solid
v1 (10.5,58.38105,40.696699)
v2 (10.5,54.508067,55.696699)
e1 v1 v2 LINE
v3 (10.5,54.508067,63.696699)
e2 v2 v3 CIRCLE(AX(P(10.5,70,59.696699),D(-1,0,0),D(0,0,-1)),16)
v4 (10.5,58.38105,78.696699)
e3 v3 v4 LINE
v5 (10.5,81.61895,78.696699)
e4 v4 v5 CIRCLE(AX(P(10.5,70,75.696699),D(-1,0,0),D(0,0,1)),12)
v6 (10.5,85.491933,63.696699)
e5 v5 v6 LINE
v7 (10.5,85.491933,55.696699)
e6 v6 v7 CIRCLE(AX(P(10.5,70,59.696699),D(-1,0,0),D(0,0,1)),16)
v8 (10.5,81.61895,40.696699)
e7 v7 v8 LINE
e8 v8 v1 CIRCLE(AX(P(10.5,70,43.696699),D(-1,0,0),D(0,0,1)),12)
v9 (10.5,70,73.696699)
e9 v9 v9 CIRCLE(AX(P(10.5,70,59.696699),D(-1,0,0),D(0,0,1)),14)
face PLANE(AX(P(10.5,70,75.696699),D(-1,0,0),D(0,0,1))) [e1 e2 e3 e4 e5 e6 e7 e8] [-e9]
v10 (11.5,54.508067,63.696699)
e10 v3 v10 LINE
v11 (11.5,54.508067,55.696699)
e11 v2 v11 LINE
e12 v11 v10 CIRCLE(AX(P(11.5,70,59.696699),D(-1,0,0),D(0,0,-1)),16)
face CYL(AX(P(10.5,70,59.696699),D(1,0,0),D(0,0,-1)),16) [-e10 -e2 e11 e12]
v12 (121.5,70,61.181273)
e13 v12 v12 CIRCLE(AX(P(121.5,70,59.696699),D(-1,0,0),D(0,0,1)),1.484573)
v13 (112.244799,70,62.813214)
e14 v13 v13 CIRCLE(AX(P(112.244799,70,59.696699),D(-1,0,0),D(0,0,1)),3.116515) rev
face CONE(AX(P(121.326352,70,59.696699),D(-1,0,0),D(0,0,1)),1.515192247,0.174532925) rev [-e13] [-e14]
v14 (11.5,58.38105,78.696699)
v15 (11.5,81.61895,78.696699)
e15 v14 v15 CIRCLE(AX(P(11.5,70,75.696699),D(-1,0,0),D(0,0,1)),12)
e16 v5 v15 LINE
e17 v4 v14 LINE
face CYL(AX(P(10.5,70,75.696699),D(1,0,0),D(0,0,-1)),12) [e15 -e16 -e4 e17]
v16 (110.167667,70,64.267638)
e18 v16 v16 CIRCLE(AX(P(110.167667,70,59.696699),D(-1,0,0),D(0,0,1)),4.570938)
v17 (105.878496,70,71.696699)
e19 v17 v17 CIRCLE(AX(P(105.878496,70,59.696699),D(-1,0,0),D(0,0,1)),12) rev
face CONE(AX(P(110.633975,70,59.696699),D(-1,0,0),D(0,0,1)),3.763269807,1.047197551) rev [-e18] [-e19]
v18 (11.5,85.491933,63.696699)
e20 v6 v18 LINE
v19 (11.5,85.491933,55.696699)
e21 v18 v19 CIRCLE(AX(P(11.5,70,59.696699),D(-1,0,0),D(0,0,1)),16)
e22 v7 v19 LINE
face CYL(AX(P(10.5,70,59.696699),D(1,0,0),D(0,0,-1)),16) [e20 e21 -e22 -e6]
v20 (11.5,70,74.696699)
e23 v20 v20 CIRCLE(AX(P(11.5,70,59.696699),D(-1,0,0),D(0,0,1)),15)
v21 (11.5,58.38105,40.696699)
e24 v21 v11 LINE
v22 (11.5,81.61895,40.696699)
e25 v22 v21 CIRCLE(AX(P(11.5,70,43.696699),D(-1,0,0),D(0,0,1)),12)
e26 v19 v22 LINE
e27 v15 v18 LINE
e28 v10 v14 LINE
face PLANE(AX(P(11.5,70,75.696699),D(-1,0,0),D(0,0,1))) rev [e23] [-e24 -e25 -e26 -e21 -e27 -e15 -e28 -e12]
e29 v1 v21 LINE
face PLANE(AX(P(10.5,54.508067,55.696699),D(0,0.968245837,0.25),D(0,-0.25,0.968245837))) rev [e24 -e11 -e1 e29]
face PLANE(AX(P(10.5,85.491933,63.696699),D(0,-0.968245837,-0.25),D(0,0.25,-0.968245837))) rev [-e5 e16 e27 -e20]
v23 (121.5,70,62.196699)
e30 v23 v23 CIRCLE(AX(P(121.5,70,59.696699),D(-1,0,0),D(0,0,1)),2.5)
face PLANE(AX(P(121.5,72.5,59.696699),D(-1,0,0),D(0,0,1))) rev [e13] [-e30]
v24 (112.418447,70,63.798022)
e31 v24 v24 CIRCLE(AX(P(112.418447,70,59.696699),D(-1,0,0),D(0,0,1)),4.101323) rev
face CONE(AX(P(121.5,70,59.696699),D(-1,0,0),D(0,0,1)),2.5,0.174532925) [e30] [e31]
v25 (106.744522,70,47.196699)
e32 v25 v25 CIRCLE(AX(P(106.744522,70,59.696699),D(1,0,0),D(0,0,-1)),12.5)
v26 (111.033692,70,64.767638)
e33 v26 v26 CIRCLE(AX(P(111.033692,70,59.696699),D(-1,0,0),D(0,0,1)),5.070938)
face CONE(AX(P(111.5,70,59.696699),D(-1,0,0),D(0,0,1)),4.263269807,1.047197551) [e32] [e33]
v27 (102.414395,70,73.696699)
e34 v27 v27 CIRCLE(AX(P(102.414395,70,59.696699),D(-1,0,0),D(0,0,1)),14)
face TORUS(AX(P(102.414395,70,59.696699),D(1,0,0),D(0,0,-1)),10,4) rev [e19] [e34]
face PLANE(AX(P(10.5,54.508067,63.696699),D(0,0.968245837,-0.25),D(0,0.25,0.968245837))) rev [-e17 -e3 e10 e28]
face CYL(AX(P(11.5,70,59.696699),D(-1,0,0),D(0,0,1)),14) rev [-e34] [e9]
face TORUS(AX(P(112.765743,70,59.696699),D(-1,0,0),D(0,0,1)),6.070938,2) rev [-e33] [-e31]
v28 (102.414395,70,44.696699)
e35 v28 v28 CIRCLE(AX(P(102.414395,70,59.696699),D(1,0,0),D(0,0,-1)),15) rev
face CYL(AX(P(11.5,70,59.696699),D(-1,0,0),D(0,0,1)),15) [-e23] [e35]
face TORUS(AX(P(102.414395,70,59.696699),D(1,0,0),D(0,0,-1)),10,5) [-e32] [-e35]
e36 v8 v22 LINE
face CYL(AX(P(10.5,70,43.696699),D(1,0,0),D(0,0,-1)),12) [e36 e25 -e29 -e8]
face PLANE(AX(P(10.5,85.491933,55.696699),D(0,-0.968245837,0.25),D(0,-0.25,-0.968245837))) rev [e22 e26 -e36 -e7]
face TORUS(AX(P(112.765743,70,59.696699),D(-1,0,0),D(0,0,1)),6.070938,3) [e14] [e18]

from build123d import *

# Parameters (mm, degrees)
BOSS_EXTRUDE1_DEPTH     = 90
FILLET1_R               = 7.5
FILLET2_R               = 2
SKETCH2_W               = 20
SKETCH2_H               = 80
SKETCH2_W_2             = 32
BOSS_EXTRUDE2_DEPTH     = 20
SKETCH3_R               = 2.5
BOSS_EXTRUDE3_DEPTH     = 111
BOSS_EXTRUDE4_START     = 7.5
SKETCH4_W               = 80
SKETCH4_H               = 20
SKETCH4_R               = 3.25
BOSS_EXTRUDE4_DEPTH     = 20
MOVE_FACE1_BY           = 1.5
MOVE_FACE2_BY           = 1.5
FILLET3_R               = 4
FILLET4_R               = 4
CUT_EXTRUDE1_DEPTH      = 2
BOSS_EXTRUDE5_DEPTH     = 2
SKETCH7_W               = 58
SKETCH7_H               = 15
CUT_EXTRUDE2_DEPTH      = 0.5
SKETCH8_R               = 10
BOSS_EXTRUDE6_DEPTH     = 1.5
SKETCH10_R              = 4.25
SKETCH10_R_2            = 2.75
CUT_EXTRUDE_THIN1_DEPTH = 1.5
SKETCH11_RX             = 5
SKETCH11_RY             = 2.5
BOSS_EXTRUDE7_DEPTH     = 1.5
LPATTERN1_COUNT         = 3
LPATTERN1_PITCH         = 24
SKETCH12_RX             = 5
SKETCH12_RY             = 2.5
BOSS_EXTRUDE8_DEPTH     = 1.5
LPATTERN2_START         = 113.13708499
LPATTERN2_DEPTH         = 1.5
FILLET7_R               = 7.5
FILLET5_R               = 5
FILLET6_R               = 2
SHELL1_T                = -1
SKETCH14_R              = 14
BOSS_EXTRUDE9_DEPTH     = 1
BOSS_EXTRUDE10_DEPTH    = 1
BOSS_EXTRUDE11_START    = -30
SKETCH16_R              = 13
BOSS_EXTRUDE11_DEPTH    = 10
BOSS_EXTRUDE12_REACH    = 233.484
SKETCH18_R              = 3
SKETCH17_W              = 1.5
SKETCH17_H              = 20
SKETCH17_W_2            = 20
SKETCH17_H_2            = 1.5
EXTRUDE_THIN1_DEPTH     = 63.5
SKETCH20_R              = 12.5
BOSS_EXTRUDE13_DEPTH    = 5
FILLET8_R               = 2


# Read off the part's stored shape, not the designer's step: LPattern2, Body-Move/Copy1
with BuildPart() as part:
    # Sketch1 → Boss-Extrude1 (new, symmetric)
    with BuildSketch(Plane(origin=(0, 0, 0), x_dir=(0, 0, -1), z_dir=(1, 0, 0))):
        Polygon((0, 0), (0, 45), (-115, 45), (-160, 0), align=None)
    extrude(amount=BOSS_EXTRUDE1_DEPTH, both=True)

    # Fillet1
    fillet1_edges = [part.edges().sort_by_distance(p)[0] for p in [
        (0, 0, 160),
        (0, 45, 115),
        (0, 45, 0),
        (0, 0, 0),
    ]]
    fillet(fillet1_edges, radius=FILLET1_R)

    # Fillet2
    fillet2_edges = [part.edges().sort_by_distance(p)[0] for p in [
        (-90, 0, 74.696699141),
        (90, 0, 74.696699141),
        (-90, 27.803300859, 132.196699141),
        (-90, 45, 59.696699141),
        (-90, 22.5, 0),
        (-90, 44.429096494, 114.763524025),
        (-90, 2.196699141, 2.196699141),
        (-90, 42.803300859, 2.196699141),
        (-90, 4.629874257, 148.822494776),
        (90, 27.803300859, 132.196699141),
        (90, 22.5, 0),
        (90, 45, 59.696699141),
        (90, 44.429096494, 114.763524025),
        (90, 2.196699141, 2.196699141),
        (90, 42.803300859, 2.196699141),
        (90, 4.629874257, 148.822494776),
    ]]
    fillet(fillet2_edges, radius=FILLET2_R)

    # Sketch2 → Boss-Extrude2 (add)
    with BuildSketch(Plane(origin=(0, 45, 0), x_dir=(1, 0, 0), z_dir=(0, 1, 0))):
        with Locations((-71.5, -59.696699141)):
            Rectangle(SKETCH2_W, SKETCH2_H)
        with Locations((65.5, -59.696699141)):
            Rectangle(SKETCH2_W_2, SKETCH2_H)
    extrude(amount=BOSS_EXTRUDE2_DEPTH)

    # Sketch3 → Boss-Extrude3 (add)
    with BuildSketch(Plane(origin=(-61.5, 0, 0), x_dir=(0, 0, -1), z_dir=(1, 0, 0))):
        with Locations(Location((-89.696699141, 59.5, 0), (0, 0, 180))):
            Circle(SKETCH3_R)
        with Locations(Location((-89.696699141, 50.5, 0), (0, 0, 180))):
            Circle(SKETCH3_R)
        with Locations(Location((-29.696699141, 50.5, 0), (0, 0, 180))):
            Circle(SKETCH3_R)
        with Locations(Location((-29.696699141, 59.5, 0), (0, 0, 180))):
            Circle(SKETCH3_R)
    extrude(amount=BOSS_EXTRUDE3_DEPTH)

    # Fillet3
    fillet3_edges = [part.edges().sort_by_distance(p)[0] for p in [
        (65.5, 65, 99.696699141),
        (65.5, 65, 19.696699141),
        (-71.5, 65, 99.696699141),
        (-71.5, 65, 19.696699141),
    ]]
    fillet(fillet3_edges, radius=FILLET3_R)

    # Sketch5 → Cut-Extrude1 (cut)
    with BuildSketch(Plane(origin=(0, 80, 80), x_dir=(1, 0, 0), z_dir=(0, 0.7071067811865511, 0.707106781186544))):
        with BuildLine():
            Line((-65, -56.317279836), (65, -56.317279836))
            ThreePointArc((65, -56.317279836), (66.767766953, -57.049512883), (67.5, -58.817279836))
            Line((67.5, -58.817279836), (67.5, -88.817279836))
            ThreePointArc((67.5, -88.817279836), (66.767766953, -90.585046789), (65, -91.317279836))
            Line((65, -91.317279836), (-65, -91.317279836))
            ThreePointArc((-65, -91.317279836), (-66.767766953, -90.585046789), (-67.5, -88.817279836))
            Line((-67.5, -88.817279836), (-67.5, -58.817279836))
            ThreePointArc((-67.5, -58.817279836), (-66.767766953, -57.049512883), (-65, -56.317279836))
        make_face()
    extrude(amount=-CUT_EXTRUDE1_DEPTH, mode=Mode.SUBTRACT)


with BuildPart() as body_2:
    # Sketch4 → Boss-Extrude4 (new body)
    with BuildSketch(Plane(origin=(-61.5, 0, 0), x_dir=(0, 0, -1), z_dir=(1, 0, 0)).offset(BOSS_EXTRUDE4_START)):
        with Locations((-59.696699141, 55)):
            Rectangle(SKETCH4_W, SKETCH4_H)
        with Locations((-89.696699141, 59.5)):
            Circle(SKETCH4_R, mode=Mode.SUBTRACT)
        with Locations((-89.696699141, 50.5)):
            Circle(SKETCH4_R, mode=Mode.SUBTRACT)
        with Locations((-29.696699141, 59.5)):
            Circle(SKETCH4_R, mode=Mode.SUBTRACT)
        with Locations((-29.696699141, 50.5)):
            Circle(SKETCH4_R, mode=Mode.SUBTRACT)
    extrude(amount=BOSS_EXTRUDE4_DEPTH)

    # Move Face1: a face moved outward by 1.5
    extrude(body_2.faces().sort_by_distance((-44, 65, 59.696699141))[0], amount=MOVE_FACE1_BY, dir=(0, 1, 0))

    # Move Face2: a face moved inward by 1.5
    extrude(body_2.faces().sort_by_distance((-44, 45, 59.696699141))[0], amount=MOVE_FACE2_BY, dir=(0, 1, 0), mode=Mode.SUBTRACT)

    # Fillet4
    fillet4_edges = [body_2.edges().sort_by_distance(p)[0] for p in [
        (-44, 66.5, 99.696699141),
        (-44, 66.5, 19.696699141),
        (-44, 46.5, 19.696699141),
        (-44, 46.5, 99.696699141),
    ]]
    fillet(fillet4_edges, radius=FILLET4_R)


with BuildPart() as body_3:
    # Sketch6 → Boss-Extrude5 (new body)
    with BuildSketch(Plane(origin=(0, 78.585786438, 78.585786438), x_dir=(1, 0, 0), z_dir=(0, 0.7071067811865509, 0.7071067811865441))):
        with BuildLine():
            Line((65, -56.317279836), (-65, -56.317279836))
            ThreePointArc((-65, -56.317279836), (-66.767766953, -57.049512883), (-67.5, -58.817279836))
            Line((-67.5, -58.817279836), (-67.5, -88.817279836))
            ThreePointArc((-67.5, -88.817279836), (-66.767766953, -90.585046789), (-65, -91.317279836))
            Line((-65, -91.317279836), (65, -91.317279836))
            ThreePointArc((65, -91.317279836), (66.767766953, -90.585046789), (67.5, -88.817279836))
            Line((67.5, -88.817279836), (67.5, -58.817279836))
            ThreePointArc((67.5, -58.817279836), (66.767766953, -57.049512883), (65, -56.317279836))
        make_face()
    extrude(amount=BOSS_EXTRUDE5_DEPTH)

    # Sketch7 → Cut-Extrude2 (cut)
    with BuildSketch(Plane(origin=(0, 80, 80), x_dir=(1, 0, 0), z_dir=(0, 0.7071067811865509, 0.7071067811865441))):
        with Locations((-28.5, -71.817279836)):
            Rectangle(SKETCH7_W, SKETCH7_H)
    extrude(amount=-CUT_EXTRUDE2_DEPTH, mode=Mode.SUBTRACT)

    # Sketch8 → Boss-Extrude6 (add)
    with BuildSketch(Plane(origin=(0, 80, 80), x_dir=(1, 0, 0), z_dir=(0, 0.7071067811865509, 0.7071067811865441))):
        with Locations(Location((15.5, -71.817279836, 0), (0, 0, 270))):
            Circle(SKETCH8_R)
    extrude(amount=BOSS_EXTRUDE6_DEPTH)

    # Sketch10 → Cut-Extrude-Thin1 (cut)
    # profile 1 of 5: a face of its own
    with BuildSketch(Plane(origin=(0, 81.060660172, 81.060660172), x_dir=(1, 0, 0), z_dir=(0, 0.7071067811865509, 0.7071067811865441))):
        with Locations((15.5, -71.817279836)):
            Circle(SKETCH10_R)
        with Locations((15.5, -71.817279836)):
            Circle(SKETCH10_R_2, mode=Mode.SUBTRACT)
    # profile 2 of 5: a face of its own
    with BuildSketch(Plane(origin=(0, 81.060660172, 81.060660172), x_dir=(1, 0, 0), z_dir=(0, 0.7071067811865509, 0.7071067811865441))):
        Polygon((7.898602102, -65.27654211), (12.49479618, -69.872736188), (13.555456352, -68.812076016), (8.959262274, -64.215881939), align=None)
    # profile 3 of 5: a face of its own
    with BuildSketch(Plane(origin=(0, 81.060660172, 81.060660172), x_dir=(1, 0, 0), z_dir=(0, 0.7071067811865509, 0.7071067811865441))):
        Polygon((22.040737726, -64.215881939), (17.444543648, -68.812076016), (18.50520382, -69.872736188), (23.101397898, -65.27654211), align=None)
    # profile 4 of 5: a face of its own
    with BuildSketch(Plane(origin=(0, 81.060660172, 81.060660172), x_dir=(1, 0, 0), z_dir=(0, 0.7071067811865509, 0.7071067811865441))):
        Polygon((17.444543648, -74.822483656), (22.040737726, -79.418677734), (23.101397898, -78.358017562), (18.50520382, -73.761823485), align=None)
    # profile 5 of 5: a face of its own
    with BuildSketch(Plane(origin=(0, 81.060660172, 81.060660172), x_dir=(1, 0, 0), z_dir=(0, 0.7071067811865509, 0.7071067811865441))):
        Polygon((12.49479618, -73.761823485), (7.898602102, -78.358017562), (8.959262274, -79.418677734), (13.555456352, -74.822483656), align=None)
    extrude(amount=-CUT_EXTRUDE_THIN1_DEPTH, mode=Mode.SUBTRACT)

    # Sketch11 → Boss-Extrude7 (add)
    with BuildSketch(Plane(origin=(0, 80, 80), x_dir=(1, 0, 0), z_dir=(0, 0.7071067811865509, 0.7071067811865441))):
        with Locations((-52.5, -85.317279836)):
            Ellipse(SKETCH11_RX, SKETCH11_RY)
    boss_extrude7 = extrude(amount=BOSS_EXTRUDE7_DEPTH)

    # LPattern1: Boss-Extrude7 ×3
    with Locations(*[(i * LPATTERN1_PITCH, 0, 0) for i in range(1, LPATTERN1_COUNT)]):
        add(boss_extrude7)

    # Sketch12 → Boss-Extrude8 (add)
    with BuildSketch(Plane(origin=(0, 80, 80), x_dir=(1, 0, 0), z_dir=(0, 0.7071067811865509, 0.7071067811865441))):
        with Locations((32.5, -66.317279836)):
            Ellipse(SKETCH12_RX, SKETCH12_RY)
    extrude(amount=BOSS_EXTRUDE8_DEPTH)

    # LPattern2 outline → LPattern2 (add)
    with BuildSketch(Plane(origin=(0, 0, 0), x_dir=(1, 0, 0), z_dir=(0, 0.707106781186551, 0.7071067811865439)).offset(LPATTERN2_START)):
        with BuildLine():
            add(Edge.make_bspline(
                [(37.5, -74.317279836), (37.5, -69.987152818), (30, -72.152216327), (22.5, -74.317279836), (30, -76.482343346), (37.5, -78.647406855), (37.5, -74.317279836)],
                knots=[0, 0, 0, 2.094395102, 2.094395102, 4.188790205, 4.188790205, 6.283185307, 6.283185307, 6.283185307], degree=2, weights=[1, 0.5, 1, 0.5, 1, 0.5, 1]))
        make_face()
        with BuildLine():
            add(Edge.make_bspline(
                [(37.5, -82.317279836), (37.5, -77.987152818), (30, -80.152216327), (22.5, -82.317279836), (30, -84.482343346), (37.5, -86.647406855), (37.5, -82.317279836)],
                knots=[0, 0, 0, 2.094395102, 2.094395102, 4.188790205, 4.188790205, 6.283185307, 6.283185307, 6.283185307], degree=2, weights=[1, 0.5, 1, 0.5, 1, 0.5, 1]))
        make_face()
        with BuildLine():
            add(Edge.make_bspline(
                [(49.5, -66.317279836), (49.5, -61.987152818), (42, -64.152216327), (34.5, -66.317279836), (42, -68.482343346), (49.5, -70.647406855), (49.5, -66.317279836)],
                knots=[0, 0, 0, 2.094395102, 2.094395102, 4.188790205, 4.188790205, 6.283185307, 6.283185307, 6.283185307], degree=2, weights=[1, 0.5, 1, 0.5, 1, 0.5, 1]))
        make_face()
        with BuildLine():
            add(Edge.make_bspline(
                [(49.5, -74.317279836), (49.5, -69.987152818), (42, -72.152216327), (34.5, -74.317279836), (42, -76.482343346), (49.5, -78.647406855), (49.5, -74.317279836)],
                knots=[0, 0, 0, 2.094395102, 2.094395102, 4.188790205, 4.188790205, 6.283185307, 6.283185307, 6.283185307], degree=2, weights=[1, 0.5, 1, 0.5, 1, 0.5, 1]))
        make_face()
        with BuildLine():
            add(Edge.make_bspline(
                [(49.5, -82.317279836), (49.5, -77.987152818), (42, -80.152216327), (34.5, -82.317279836), (42, -84.482343346), (49.5, -86.647406855), (49.5, -82.317279836)],
                knots=[0, 0, 0, 2.094395102, 2.094395102, 4.188790205, 4.188790205, 6.283185307, 6.283185307, 6.283185307], degree=2, weights=[1, 0.5, 1, 0.5, 1, 0.5, 1]))
        make_face()
        with BuildLine():
            add(Edge.make_bspline(
                [(61.5, -66.317279836), (61.5, -61.987152818), (54, -64.152216327), (46.5, -66.317279836), (54, -68.482343346), (61.5, -70.647406855), (61.5, -66.317279836)],
                knots=[0, 0, 0, 2.094395102, 2.094395102, 4.188790205, 4.188790205, 6.283185307, 6.283185307, 6.283185307], degree=2, weights=[1, 0.5, 1, 0.5, 1, 0.5, 1]))
        make_face()
        with BuildLine():
            add(Edge.make_bspline(
                [(61.5, -74.317279836), (61.5, -69.987152818), (54, -72.152216327), (46.5, -74.317279836), (54, -76.482343346), (61.5, -78.647406855), (61.5, -74.317279836)],
                knots=[0, 0, 0, 2.094395102, 2.094395102, 4.188790205, 4.188790205, 6.283185307, 6.283185307, 6.283185307], degree=2, weights=[1, 0.5, 1, 0.5, 1, 0.5, 1]))
        make_face()
        with BuildLine():
            add(Edge.make_bspline(
                [(61.5, -82.317279836), (61.5, -77.987152818), (54, -80.152216327), (46.5, -82.317279836), (54, -84.482343346), (61.5, -86.647406855), (61.5, -82.317279836)],
                knots=[0, 0, 0, 2.094395102, 2.094395102, 4.188790205, 4.188790205, 6.283185307, 6.283185307, 6.283185307], degree=2, weights=[1, 0.5, 1, 0.5, 1, 0.5, 1]))
        make_face()
    extrude(amount=LPATTERN2_DEPTH)


with BuildPart() as body_4:
    # Sketch13 → Revolve1 (revolve)
    with BuildSketch(Plane.XY.offset(59.696699141), mode=Mode.PRIVATE) as revolve1_sk:
        Polygon((11.5, 70), (11.5, 85), (105.301145933, 85), (111.5, 74.263269807), (121.5, 72.5), (121.5, 70), align=None)
    revolve(revolve1_sk.sketch.rotate(Axis((11.5, 70, 59.696699141), (1, 0, 0)), 90), axis=Axis((11.5, 70, 59.696699141), (1, 0, 0)))

    # Fillet5
    fillet5_edges = [body_4.edges().sort_by_distance(p)[0] for p in [
        (105.301145933, 70, 44.696699141),
    ]]
    fillet(fillet5_edges, radius=FILLET5_R)

    # Fillet6
    fillet6_edges = [body_4.edges().sort_by_distance(p)[0] for p in [
        (111.5, 70, 55.433429334),
    ]]
    fillet(fillet6_edges, radius=FILLET6_R)

    # Shell1
    shell1_openings = [body_4.faces().sort_by_distance(p)[0] for p in [
        (121.5, 70, 59.696699141),
        (11.5, 70, 59.696699141),
    ]]
    offset(amount=SHELL1_T, openings=shell1_openings, kind=Kind.INTERSECTION)

    # Sketch14 → Boss-Extrude9 (add)
    with BuildSketch(Plane.ZY.offset(-11.5)):
        with BuildLine():
            Line((55.696699141, 85.491933385), (40.696699141, 81.618950039))
            ThreePointArc((40.696699141, 81.618950039), (31.696699141, 70), (40.696699141, 58.381049961))
            Line((40.696699141, 58.381049961), (55.696699141, 54.508066615))
            ThreePointArc((55.696699141, 54.508066615), (59.696699141, 54), (63.696699141, 54.508066615))
            Line((63.696699141, 54.508066615), (78.696699141, 58.381049961))
            ThreePointArc((78.696699141, 58.381049961), (87.696699141, 70), (78.696699141, 81.618950039))
            Line((78.696699141, 81.618950039), (63.696699141, 85.491933385))
            ThreePointArc((63.696699141, 85.491933385), (59.696699141, 86), (55.696699141, 85.491933385))
        make_face()
        with Locations((59.696699141, 70)):
            Circle(SKETCH14_R, mode=Mode.SUBTRACT)
    extrude(amount=BOSS_EXTRUDE9_DEPTH)


with BuildPart() as body_5:
    # Body-Move/Copy1 outline → Body-Move/Copy1 (revolve)
    with BuildSketch(Plane(origin=(0, 70, 59.696699141), x_dir=(0, 1, 0), z_dir=(0, 0, -1))):
        Polygon((0, 121.5), (0, 11.5), (15, 11.5), (15, 105.301145933), (4.263269807, 111.5), (2.5, 121.5), align=None)
    revolve(axis=Axis((0, 70, 59.696699141), (1, 0, 0)))


with BuildPart() as part_1:
    add(part.part)

    # Combine1: cut body 5
    add(body_5.part, mode=Mode.SUBTRACT)

    # Fillet7
    fillet7_edges = [part_1.edges().sort_by_distance(p)[0] for p in [
        (65.5, 65, 73.838834765),
        (65.5, 65, 45.554563517),
    ]]
    fillet(fillet7_edges, radius=FILLET7_R)

    # Sketch20 → Boss-Extrude13 (add)
    with BuildSketch(Plane.XZ):
        with Locations(Location((-60, 116.893398282, 0), (0, 0, 90))):
            Circle(SKETCH20_R)
        with Locations(Location((-60, 32.5, 0), (0, 0, 90))):
            Circle(SKETCH20_R)
        with Locations(Location((60, 32.5, 0), (0, 0, 90))):
            Circle(SKETCH20_R)
        with Locations(Location((60, 116.893398282, 0), (0, 0, 90))):
            Circle(SKETCH20_R)
    extrude(amount=BOSS_EXTRUDE13_DEPTH)

    # Fillet8
    fillet8_edges = [part_1.edges().sort_by_distance(p)[0] for p in [
        (-60, -5, 104.393398282),
        (-60, -5, 20),
        (60, -5, 20),
        (60, -5, 104.393398282),
    ]]
    fillet(fillet8_edges, radius=FILLET8_R)


with BuildPart() as body_5_2:
    # Sketch15 → Boss-Extrude10 (new body)
    with BuildSketch(Plane(origin=(-34, 0, 0), x_dir=(0, 0, -1), z_dir=(1, 0, 0))):
        with BuildLine():
            Line((-63.696699141, 85.491933385), (-78.696699141, 81.618950039))
            ThreePointArc((-78.696699141, 81.618950039), (-87.696699141, 70), (-78.696699141, 58.381049961))
            Line((-78.696699141, 58.381049961), (-63.696699141, 54.508066615))
            ThreePointArc((-63.696699141, 54.508066615), (-59.696699141, 54), (-55.696699141, 54.508066615))
            Line((-55.696699141, 54.508066615), (-40.696699141, 58.381049961))
            ThreePointArc((-40.696699141, 58.381049961), (-31.696699141, 70), (-40.696699141, 81.618950039))
            Line((-40.696699141, 81.618950039), (-55.696699141, 85.491933385))
            ThreePointArc((-55.696699141, 85.491933385), (-59.696699141, 86), (-63.696699141, 85.491933385))
        make_face()
    extrude(amount=BOSS_EXTRUDE10_DEPTH)


with BuildPart() as body_6:
    # Sketch16 → Boss-Extrude11 (new body)
    with BuildSketch(Plane.ZY.offset(-10.5).offset(BOSS_EXTRUDE11_START)):
        with Locations((59.696699141, 70)):
            Circle(SKETCH16_R)
    extrude(amount=BOSS_EXTRUDE11_DEPTH)

    # Sketch18 → Boss-Extrude12 (add, up to next)
    with BuildSketch(Plane(origin=(-33, 0, 0), x_dir=(0, 0, -1), z_dir=(1, 0, 0)), mode=Mode.PRIVATE) as boss_extrude12_sk1:
        with Locations(Location((-59.696699141, 70, 0), (0, 0, 180))):
            Circle(SKETCH18_R)
    boss_extrude12_tool1 = extrude(boss_extrude12_sk1.sketch, amount=BOSS_EXTRUDE12_REACH, mode=Mode.PRIVATE) - body_6.part

    add(body_5_2.part)  # Boss-Extrude12 merges body 5 2
    add(boss_extrude12_tool1.solids().sort_by_distance((-33, 70, 59.696699))[0])

    # Sketch17 → Extrude-Thin1 (add)
    with BuildSketch(Plane(origin=(-33, 0, 0), x_dir=(0, 0, -1), z_dir=(1, 0, 0))):
        with Locations((-59.696699141, 70)):
            Rectangle(SKETCH17_W, SKETCH17_H)
        with Locations((-59.696699141, 70)):
            Rectangle(SKETCH17_W_2, SKETCH17_H_2)
    extrude(amount=EXTRUDE_THIN1_DEPTH)

    # Sketch19 → Cut-Revolve3 (revolve, cut)
    with BuildSketch(Plane.XY.offset(59.696699141), mode=Mode.PRIVATE) as cut_revolve3_sk:
        Polygon((-33, 76.452368755), (-18, 80), (-18, 81.618950039), (-33, 81.618950039), align=None)
    revolve(cut_revolve3_sk.sketch.rotate(Axis((111.5, 70, 59.696699141), (-1, 0, 0)), 270), axis=Axis((111.5, 70, 59.696699141), (-1, 0, 0)), mode=Mode.SUBTRACT)


solid = body_4.part
